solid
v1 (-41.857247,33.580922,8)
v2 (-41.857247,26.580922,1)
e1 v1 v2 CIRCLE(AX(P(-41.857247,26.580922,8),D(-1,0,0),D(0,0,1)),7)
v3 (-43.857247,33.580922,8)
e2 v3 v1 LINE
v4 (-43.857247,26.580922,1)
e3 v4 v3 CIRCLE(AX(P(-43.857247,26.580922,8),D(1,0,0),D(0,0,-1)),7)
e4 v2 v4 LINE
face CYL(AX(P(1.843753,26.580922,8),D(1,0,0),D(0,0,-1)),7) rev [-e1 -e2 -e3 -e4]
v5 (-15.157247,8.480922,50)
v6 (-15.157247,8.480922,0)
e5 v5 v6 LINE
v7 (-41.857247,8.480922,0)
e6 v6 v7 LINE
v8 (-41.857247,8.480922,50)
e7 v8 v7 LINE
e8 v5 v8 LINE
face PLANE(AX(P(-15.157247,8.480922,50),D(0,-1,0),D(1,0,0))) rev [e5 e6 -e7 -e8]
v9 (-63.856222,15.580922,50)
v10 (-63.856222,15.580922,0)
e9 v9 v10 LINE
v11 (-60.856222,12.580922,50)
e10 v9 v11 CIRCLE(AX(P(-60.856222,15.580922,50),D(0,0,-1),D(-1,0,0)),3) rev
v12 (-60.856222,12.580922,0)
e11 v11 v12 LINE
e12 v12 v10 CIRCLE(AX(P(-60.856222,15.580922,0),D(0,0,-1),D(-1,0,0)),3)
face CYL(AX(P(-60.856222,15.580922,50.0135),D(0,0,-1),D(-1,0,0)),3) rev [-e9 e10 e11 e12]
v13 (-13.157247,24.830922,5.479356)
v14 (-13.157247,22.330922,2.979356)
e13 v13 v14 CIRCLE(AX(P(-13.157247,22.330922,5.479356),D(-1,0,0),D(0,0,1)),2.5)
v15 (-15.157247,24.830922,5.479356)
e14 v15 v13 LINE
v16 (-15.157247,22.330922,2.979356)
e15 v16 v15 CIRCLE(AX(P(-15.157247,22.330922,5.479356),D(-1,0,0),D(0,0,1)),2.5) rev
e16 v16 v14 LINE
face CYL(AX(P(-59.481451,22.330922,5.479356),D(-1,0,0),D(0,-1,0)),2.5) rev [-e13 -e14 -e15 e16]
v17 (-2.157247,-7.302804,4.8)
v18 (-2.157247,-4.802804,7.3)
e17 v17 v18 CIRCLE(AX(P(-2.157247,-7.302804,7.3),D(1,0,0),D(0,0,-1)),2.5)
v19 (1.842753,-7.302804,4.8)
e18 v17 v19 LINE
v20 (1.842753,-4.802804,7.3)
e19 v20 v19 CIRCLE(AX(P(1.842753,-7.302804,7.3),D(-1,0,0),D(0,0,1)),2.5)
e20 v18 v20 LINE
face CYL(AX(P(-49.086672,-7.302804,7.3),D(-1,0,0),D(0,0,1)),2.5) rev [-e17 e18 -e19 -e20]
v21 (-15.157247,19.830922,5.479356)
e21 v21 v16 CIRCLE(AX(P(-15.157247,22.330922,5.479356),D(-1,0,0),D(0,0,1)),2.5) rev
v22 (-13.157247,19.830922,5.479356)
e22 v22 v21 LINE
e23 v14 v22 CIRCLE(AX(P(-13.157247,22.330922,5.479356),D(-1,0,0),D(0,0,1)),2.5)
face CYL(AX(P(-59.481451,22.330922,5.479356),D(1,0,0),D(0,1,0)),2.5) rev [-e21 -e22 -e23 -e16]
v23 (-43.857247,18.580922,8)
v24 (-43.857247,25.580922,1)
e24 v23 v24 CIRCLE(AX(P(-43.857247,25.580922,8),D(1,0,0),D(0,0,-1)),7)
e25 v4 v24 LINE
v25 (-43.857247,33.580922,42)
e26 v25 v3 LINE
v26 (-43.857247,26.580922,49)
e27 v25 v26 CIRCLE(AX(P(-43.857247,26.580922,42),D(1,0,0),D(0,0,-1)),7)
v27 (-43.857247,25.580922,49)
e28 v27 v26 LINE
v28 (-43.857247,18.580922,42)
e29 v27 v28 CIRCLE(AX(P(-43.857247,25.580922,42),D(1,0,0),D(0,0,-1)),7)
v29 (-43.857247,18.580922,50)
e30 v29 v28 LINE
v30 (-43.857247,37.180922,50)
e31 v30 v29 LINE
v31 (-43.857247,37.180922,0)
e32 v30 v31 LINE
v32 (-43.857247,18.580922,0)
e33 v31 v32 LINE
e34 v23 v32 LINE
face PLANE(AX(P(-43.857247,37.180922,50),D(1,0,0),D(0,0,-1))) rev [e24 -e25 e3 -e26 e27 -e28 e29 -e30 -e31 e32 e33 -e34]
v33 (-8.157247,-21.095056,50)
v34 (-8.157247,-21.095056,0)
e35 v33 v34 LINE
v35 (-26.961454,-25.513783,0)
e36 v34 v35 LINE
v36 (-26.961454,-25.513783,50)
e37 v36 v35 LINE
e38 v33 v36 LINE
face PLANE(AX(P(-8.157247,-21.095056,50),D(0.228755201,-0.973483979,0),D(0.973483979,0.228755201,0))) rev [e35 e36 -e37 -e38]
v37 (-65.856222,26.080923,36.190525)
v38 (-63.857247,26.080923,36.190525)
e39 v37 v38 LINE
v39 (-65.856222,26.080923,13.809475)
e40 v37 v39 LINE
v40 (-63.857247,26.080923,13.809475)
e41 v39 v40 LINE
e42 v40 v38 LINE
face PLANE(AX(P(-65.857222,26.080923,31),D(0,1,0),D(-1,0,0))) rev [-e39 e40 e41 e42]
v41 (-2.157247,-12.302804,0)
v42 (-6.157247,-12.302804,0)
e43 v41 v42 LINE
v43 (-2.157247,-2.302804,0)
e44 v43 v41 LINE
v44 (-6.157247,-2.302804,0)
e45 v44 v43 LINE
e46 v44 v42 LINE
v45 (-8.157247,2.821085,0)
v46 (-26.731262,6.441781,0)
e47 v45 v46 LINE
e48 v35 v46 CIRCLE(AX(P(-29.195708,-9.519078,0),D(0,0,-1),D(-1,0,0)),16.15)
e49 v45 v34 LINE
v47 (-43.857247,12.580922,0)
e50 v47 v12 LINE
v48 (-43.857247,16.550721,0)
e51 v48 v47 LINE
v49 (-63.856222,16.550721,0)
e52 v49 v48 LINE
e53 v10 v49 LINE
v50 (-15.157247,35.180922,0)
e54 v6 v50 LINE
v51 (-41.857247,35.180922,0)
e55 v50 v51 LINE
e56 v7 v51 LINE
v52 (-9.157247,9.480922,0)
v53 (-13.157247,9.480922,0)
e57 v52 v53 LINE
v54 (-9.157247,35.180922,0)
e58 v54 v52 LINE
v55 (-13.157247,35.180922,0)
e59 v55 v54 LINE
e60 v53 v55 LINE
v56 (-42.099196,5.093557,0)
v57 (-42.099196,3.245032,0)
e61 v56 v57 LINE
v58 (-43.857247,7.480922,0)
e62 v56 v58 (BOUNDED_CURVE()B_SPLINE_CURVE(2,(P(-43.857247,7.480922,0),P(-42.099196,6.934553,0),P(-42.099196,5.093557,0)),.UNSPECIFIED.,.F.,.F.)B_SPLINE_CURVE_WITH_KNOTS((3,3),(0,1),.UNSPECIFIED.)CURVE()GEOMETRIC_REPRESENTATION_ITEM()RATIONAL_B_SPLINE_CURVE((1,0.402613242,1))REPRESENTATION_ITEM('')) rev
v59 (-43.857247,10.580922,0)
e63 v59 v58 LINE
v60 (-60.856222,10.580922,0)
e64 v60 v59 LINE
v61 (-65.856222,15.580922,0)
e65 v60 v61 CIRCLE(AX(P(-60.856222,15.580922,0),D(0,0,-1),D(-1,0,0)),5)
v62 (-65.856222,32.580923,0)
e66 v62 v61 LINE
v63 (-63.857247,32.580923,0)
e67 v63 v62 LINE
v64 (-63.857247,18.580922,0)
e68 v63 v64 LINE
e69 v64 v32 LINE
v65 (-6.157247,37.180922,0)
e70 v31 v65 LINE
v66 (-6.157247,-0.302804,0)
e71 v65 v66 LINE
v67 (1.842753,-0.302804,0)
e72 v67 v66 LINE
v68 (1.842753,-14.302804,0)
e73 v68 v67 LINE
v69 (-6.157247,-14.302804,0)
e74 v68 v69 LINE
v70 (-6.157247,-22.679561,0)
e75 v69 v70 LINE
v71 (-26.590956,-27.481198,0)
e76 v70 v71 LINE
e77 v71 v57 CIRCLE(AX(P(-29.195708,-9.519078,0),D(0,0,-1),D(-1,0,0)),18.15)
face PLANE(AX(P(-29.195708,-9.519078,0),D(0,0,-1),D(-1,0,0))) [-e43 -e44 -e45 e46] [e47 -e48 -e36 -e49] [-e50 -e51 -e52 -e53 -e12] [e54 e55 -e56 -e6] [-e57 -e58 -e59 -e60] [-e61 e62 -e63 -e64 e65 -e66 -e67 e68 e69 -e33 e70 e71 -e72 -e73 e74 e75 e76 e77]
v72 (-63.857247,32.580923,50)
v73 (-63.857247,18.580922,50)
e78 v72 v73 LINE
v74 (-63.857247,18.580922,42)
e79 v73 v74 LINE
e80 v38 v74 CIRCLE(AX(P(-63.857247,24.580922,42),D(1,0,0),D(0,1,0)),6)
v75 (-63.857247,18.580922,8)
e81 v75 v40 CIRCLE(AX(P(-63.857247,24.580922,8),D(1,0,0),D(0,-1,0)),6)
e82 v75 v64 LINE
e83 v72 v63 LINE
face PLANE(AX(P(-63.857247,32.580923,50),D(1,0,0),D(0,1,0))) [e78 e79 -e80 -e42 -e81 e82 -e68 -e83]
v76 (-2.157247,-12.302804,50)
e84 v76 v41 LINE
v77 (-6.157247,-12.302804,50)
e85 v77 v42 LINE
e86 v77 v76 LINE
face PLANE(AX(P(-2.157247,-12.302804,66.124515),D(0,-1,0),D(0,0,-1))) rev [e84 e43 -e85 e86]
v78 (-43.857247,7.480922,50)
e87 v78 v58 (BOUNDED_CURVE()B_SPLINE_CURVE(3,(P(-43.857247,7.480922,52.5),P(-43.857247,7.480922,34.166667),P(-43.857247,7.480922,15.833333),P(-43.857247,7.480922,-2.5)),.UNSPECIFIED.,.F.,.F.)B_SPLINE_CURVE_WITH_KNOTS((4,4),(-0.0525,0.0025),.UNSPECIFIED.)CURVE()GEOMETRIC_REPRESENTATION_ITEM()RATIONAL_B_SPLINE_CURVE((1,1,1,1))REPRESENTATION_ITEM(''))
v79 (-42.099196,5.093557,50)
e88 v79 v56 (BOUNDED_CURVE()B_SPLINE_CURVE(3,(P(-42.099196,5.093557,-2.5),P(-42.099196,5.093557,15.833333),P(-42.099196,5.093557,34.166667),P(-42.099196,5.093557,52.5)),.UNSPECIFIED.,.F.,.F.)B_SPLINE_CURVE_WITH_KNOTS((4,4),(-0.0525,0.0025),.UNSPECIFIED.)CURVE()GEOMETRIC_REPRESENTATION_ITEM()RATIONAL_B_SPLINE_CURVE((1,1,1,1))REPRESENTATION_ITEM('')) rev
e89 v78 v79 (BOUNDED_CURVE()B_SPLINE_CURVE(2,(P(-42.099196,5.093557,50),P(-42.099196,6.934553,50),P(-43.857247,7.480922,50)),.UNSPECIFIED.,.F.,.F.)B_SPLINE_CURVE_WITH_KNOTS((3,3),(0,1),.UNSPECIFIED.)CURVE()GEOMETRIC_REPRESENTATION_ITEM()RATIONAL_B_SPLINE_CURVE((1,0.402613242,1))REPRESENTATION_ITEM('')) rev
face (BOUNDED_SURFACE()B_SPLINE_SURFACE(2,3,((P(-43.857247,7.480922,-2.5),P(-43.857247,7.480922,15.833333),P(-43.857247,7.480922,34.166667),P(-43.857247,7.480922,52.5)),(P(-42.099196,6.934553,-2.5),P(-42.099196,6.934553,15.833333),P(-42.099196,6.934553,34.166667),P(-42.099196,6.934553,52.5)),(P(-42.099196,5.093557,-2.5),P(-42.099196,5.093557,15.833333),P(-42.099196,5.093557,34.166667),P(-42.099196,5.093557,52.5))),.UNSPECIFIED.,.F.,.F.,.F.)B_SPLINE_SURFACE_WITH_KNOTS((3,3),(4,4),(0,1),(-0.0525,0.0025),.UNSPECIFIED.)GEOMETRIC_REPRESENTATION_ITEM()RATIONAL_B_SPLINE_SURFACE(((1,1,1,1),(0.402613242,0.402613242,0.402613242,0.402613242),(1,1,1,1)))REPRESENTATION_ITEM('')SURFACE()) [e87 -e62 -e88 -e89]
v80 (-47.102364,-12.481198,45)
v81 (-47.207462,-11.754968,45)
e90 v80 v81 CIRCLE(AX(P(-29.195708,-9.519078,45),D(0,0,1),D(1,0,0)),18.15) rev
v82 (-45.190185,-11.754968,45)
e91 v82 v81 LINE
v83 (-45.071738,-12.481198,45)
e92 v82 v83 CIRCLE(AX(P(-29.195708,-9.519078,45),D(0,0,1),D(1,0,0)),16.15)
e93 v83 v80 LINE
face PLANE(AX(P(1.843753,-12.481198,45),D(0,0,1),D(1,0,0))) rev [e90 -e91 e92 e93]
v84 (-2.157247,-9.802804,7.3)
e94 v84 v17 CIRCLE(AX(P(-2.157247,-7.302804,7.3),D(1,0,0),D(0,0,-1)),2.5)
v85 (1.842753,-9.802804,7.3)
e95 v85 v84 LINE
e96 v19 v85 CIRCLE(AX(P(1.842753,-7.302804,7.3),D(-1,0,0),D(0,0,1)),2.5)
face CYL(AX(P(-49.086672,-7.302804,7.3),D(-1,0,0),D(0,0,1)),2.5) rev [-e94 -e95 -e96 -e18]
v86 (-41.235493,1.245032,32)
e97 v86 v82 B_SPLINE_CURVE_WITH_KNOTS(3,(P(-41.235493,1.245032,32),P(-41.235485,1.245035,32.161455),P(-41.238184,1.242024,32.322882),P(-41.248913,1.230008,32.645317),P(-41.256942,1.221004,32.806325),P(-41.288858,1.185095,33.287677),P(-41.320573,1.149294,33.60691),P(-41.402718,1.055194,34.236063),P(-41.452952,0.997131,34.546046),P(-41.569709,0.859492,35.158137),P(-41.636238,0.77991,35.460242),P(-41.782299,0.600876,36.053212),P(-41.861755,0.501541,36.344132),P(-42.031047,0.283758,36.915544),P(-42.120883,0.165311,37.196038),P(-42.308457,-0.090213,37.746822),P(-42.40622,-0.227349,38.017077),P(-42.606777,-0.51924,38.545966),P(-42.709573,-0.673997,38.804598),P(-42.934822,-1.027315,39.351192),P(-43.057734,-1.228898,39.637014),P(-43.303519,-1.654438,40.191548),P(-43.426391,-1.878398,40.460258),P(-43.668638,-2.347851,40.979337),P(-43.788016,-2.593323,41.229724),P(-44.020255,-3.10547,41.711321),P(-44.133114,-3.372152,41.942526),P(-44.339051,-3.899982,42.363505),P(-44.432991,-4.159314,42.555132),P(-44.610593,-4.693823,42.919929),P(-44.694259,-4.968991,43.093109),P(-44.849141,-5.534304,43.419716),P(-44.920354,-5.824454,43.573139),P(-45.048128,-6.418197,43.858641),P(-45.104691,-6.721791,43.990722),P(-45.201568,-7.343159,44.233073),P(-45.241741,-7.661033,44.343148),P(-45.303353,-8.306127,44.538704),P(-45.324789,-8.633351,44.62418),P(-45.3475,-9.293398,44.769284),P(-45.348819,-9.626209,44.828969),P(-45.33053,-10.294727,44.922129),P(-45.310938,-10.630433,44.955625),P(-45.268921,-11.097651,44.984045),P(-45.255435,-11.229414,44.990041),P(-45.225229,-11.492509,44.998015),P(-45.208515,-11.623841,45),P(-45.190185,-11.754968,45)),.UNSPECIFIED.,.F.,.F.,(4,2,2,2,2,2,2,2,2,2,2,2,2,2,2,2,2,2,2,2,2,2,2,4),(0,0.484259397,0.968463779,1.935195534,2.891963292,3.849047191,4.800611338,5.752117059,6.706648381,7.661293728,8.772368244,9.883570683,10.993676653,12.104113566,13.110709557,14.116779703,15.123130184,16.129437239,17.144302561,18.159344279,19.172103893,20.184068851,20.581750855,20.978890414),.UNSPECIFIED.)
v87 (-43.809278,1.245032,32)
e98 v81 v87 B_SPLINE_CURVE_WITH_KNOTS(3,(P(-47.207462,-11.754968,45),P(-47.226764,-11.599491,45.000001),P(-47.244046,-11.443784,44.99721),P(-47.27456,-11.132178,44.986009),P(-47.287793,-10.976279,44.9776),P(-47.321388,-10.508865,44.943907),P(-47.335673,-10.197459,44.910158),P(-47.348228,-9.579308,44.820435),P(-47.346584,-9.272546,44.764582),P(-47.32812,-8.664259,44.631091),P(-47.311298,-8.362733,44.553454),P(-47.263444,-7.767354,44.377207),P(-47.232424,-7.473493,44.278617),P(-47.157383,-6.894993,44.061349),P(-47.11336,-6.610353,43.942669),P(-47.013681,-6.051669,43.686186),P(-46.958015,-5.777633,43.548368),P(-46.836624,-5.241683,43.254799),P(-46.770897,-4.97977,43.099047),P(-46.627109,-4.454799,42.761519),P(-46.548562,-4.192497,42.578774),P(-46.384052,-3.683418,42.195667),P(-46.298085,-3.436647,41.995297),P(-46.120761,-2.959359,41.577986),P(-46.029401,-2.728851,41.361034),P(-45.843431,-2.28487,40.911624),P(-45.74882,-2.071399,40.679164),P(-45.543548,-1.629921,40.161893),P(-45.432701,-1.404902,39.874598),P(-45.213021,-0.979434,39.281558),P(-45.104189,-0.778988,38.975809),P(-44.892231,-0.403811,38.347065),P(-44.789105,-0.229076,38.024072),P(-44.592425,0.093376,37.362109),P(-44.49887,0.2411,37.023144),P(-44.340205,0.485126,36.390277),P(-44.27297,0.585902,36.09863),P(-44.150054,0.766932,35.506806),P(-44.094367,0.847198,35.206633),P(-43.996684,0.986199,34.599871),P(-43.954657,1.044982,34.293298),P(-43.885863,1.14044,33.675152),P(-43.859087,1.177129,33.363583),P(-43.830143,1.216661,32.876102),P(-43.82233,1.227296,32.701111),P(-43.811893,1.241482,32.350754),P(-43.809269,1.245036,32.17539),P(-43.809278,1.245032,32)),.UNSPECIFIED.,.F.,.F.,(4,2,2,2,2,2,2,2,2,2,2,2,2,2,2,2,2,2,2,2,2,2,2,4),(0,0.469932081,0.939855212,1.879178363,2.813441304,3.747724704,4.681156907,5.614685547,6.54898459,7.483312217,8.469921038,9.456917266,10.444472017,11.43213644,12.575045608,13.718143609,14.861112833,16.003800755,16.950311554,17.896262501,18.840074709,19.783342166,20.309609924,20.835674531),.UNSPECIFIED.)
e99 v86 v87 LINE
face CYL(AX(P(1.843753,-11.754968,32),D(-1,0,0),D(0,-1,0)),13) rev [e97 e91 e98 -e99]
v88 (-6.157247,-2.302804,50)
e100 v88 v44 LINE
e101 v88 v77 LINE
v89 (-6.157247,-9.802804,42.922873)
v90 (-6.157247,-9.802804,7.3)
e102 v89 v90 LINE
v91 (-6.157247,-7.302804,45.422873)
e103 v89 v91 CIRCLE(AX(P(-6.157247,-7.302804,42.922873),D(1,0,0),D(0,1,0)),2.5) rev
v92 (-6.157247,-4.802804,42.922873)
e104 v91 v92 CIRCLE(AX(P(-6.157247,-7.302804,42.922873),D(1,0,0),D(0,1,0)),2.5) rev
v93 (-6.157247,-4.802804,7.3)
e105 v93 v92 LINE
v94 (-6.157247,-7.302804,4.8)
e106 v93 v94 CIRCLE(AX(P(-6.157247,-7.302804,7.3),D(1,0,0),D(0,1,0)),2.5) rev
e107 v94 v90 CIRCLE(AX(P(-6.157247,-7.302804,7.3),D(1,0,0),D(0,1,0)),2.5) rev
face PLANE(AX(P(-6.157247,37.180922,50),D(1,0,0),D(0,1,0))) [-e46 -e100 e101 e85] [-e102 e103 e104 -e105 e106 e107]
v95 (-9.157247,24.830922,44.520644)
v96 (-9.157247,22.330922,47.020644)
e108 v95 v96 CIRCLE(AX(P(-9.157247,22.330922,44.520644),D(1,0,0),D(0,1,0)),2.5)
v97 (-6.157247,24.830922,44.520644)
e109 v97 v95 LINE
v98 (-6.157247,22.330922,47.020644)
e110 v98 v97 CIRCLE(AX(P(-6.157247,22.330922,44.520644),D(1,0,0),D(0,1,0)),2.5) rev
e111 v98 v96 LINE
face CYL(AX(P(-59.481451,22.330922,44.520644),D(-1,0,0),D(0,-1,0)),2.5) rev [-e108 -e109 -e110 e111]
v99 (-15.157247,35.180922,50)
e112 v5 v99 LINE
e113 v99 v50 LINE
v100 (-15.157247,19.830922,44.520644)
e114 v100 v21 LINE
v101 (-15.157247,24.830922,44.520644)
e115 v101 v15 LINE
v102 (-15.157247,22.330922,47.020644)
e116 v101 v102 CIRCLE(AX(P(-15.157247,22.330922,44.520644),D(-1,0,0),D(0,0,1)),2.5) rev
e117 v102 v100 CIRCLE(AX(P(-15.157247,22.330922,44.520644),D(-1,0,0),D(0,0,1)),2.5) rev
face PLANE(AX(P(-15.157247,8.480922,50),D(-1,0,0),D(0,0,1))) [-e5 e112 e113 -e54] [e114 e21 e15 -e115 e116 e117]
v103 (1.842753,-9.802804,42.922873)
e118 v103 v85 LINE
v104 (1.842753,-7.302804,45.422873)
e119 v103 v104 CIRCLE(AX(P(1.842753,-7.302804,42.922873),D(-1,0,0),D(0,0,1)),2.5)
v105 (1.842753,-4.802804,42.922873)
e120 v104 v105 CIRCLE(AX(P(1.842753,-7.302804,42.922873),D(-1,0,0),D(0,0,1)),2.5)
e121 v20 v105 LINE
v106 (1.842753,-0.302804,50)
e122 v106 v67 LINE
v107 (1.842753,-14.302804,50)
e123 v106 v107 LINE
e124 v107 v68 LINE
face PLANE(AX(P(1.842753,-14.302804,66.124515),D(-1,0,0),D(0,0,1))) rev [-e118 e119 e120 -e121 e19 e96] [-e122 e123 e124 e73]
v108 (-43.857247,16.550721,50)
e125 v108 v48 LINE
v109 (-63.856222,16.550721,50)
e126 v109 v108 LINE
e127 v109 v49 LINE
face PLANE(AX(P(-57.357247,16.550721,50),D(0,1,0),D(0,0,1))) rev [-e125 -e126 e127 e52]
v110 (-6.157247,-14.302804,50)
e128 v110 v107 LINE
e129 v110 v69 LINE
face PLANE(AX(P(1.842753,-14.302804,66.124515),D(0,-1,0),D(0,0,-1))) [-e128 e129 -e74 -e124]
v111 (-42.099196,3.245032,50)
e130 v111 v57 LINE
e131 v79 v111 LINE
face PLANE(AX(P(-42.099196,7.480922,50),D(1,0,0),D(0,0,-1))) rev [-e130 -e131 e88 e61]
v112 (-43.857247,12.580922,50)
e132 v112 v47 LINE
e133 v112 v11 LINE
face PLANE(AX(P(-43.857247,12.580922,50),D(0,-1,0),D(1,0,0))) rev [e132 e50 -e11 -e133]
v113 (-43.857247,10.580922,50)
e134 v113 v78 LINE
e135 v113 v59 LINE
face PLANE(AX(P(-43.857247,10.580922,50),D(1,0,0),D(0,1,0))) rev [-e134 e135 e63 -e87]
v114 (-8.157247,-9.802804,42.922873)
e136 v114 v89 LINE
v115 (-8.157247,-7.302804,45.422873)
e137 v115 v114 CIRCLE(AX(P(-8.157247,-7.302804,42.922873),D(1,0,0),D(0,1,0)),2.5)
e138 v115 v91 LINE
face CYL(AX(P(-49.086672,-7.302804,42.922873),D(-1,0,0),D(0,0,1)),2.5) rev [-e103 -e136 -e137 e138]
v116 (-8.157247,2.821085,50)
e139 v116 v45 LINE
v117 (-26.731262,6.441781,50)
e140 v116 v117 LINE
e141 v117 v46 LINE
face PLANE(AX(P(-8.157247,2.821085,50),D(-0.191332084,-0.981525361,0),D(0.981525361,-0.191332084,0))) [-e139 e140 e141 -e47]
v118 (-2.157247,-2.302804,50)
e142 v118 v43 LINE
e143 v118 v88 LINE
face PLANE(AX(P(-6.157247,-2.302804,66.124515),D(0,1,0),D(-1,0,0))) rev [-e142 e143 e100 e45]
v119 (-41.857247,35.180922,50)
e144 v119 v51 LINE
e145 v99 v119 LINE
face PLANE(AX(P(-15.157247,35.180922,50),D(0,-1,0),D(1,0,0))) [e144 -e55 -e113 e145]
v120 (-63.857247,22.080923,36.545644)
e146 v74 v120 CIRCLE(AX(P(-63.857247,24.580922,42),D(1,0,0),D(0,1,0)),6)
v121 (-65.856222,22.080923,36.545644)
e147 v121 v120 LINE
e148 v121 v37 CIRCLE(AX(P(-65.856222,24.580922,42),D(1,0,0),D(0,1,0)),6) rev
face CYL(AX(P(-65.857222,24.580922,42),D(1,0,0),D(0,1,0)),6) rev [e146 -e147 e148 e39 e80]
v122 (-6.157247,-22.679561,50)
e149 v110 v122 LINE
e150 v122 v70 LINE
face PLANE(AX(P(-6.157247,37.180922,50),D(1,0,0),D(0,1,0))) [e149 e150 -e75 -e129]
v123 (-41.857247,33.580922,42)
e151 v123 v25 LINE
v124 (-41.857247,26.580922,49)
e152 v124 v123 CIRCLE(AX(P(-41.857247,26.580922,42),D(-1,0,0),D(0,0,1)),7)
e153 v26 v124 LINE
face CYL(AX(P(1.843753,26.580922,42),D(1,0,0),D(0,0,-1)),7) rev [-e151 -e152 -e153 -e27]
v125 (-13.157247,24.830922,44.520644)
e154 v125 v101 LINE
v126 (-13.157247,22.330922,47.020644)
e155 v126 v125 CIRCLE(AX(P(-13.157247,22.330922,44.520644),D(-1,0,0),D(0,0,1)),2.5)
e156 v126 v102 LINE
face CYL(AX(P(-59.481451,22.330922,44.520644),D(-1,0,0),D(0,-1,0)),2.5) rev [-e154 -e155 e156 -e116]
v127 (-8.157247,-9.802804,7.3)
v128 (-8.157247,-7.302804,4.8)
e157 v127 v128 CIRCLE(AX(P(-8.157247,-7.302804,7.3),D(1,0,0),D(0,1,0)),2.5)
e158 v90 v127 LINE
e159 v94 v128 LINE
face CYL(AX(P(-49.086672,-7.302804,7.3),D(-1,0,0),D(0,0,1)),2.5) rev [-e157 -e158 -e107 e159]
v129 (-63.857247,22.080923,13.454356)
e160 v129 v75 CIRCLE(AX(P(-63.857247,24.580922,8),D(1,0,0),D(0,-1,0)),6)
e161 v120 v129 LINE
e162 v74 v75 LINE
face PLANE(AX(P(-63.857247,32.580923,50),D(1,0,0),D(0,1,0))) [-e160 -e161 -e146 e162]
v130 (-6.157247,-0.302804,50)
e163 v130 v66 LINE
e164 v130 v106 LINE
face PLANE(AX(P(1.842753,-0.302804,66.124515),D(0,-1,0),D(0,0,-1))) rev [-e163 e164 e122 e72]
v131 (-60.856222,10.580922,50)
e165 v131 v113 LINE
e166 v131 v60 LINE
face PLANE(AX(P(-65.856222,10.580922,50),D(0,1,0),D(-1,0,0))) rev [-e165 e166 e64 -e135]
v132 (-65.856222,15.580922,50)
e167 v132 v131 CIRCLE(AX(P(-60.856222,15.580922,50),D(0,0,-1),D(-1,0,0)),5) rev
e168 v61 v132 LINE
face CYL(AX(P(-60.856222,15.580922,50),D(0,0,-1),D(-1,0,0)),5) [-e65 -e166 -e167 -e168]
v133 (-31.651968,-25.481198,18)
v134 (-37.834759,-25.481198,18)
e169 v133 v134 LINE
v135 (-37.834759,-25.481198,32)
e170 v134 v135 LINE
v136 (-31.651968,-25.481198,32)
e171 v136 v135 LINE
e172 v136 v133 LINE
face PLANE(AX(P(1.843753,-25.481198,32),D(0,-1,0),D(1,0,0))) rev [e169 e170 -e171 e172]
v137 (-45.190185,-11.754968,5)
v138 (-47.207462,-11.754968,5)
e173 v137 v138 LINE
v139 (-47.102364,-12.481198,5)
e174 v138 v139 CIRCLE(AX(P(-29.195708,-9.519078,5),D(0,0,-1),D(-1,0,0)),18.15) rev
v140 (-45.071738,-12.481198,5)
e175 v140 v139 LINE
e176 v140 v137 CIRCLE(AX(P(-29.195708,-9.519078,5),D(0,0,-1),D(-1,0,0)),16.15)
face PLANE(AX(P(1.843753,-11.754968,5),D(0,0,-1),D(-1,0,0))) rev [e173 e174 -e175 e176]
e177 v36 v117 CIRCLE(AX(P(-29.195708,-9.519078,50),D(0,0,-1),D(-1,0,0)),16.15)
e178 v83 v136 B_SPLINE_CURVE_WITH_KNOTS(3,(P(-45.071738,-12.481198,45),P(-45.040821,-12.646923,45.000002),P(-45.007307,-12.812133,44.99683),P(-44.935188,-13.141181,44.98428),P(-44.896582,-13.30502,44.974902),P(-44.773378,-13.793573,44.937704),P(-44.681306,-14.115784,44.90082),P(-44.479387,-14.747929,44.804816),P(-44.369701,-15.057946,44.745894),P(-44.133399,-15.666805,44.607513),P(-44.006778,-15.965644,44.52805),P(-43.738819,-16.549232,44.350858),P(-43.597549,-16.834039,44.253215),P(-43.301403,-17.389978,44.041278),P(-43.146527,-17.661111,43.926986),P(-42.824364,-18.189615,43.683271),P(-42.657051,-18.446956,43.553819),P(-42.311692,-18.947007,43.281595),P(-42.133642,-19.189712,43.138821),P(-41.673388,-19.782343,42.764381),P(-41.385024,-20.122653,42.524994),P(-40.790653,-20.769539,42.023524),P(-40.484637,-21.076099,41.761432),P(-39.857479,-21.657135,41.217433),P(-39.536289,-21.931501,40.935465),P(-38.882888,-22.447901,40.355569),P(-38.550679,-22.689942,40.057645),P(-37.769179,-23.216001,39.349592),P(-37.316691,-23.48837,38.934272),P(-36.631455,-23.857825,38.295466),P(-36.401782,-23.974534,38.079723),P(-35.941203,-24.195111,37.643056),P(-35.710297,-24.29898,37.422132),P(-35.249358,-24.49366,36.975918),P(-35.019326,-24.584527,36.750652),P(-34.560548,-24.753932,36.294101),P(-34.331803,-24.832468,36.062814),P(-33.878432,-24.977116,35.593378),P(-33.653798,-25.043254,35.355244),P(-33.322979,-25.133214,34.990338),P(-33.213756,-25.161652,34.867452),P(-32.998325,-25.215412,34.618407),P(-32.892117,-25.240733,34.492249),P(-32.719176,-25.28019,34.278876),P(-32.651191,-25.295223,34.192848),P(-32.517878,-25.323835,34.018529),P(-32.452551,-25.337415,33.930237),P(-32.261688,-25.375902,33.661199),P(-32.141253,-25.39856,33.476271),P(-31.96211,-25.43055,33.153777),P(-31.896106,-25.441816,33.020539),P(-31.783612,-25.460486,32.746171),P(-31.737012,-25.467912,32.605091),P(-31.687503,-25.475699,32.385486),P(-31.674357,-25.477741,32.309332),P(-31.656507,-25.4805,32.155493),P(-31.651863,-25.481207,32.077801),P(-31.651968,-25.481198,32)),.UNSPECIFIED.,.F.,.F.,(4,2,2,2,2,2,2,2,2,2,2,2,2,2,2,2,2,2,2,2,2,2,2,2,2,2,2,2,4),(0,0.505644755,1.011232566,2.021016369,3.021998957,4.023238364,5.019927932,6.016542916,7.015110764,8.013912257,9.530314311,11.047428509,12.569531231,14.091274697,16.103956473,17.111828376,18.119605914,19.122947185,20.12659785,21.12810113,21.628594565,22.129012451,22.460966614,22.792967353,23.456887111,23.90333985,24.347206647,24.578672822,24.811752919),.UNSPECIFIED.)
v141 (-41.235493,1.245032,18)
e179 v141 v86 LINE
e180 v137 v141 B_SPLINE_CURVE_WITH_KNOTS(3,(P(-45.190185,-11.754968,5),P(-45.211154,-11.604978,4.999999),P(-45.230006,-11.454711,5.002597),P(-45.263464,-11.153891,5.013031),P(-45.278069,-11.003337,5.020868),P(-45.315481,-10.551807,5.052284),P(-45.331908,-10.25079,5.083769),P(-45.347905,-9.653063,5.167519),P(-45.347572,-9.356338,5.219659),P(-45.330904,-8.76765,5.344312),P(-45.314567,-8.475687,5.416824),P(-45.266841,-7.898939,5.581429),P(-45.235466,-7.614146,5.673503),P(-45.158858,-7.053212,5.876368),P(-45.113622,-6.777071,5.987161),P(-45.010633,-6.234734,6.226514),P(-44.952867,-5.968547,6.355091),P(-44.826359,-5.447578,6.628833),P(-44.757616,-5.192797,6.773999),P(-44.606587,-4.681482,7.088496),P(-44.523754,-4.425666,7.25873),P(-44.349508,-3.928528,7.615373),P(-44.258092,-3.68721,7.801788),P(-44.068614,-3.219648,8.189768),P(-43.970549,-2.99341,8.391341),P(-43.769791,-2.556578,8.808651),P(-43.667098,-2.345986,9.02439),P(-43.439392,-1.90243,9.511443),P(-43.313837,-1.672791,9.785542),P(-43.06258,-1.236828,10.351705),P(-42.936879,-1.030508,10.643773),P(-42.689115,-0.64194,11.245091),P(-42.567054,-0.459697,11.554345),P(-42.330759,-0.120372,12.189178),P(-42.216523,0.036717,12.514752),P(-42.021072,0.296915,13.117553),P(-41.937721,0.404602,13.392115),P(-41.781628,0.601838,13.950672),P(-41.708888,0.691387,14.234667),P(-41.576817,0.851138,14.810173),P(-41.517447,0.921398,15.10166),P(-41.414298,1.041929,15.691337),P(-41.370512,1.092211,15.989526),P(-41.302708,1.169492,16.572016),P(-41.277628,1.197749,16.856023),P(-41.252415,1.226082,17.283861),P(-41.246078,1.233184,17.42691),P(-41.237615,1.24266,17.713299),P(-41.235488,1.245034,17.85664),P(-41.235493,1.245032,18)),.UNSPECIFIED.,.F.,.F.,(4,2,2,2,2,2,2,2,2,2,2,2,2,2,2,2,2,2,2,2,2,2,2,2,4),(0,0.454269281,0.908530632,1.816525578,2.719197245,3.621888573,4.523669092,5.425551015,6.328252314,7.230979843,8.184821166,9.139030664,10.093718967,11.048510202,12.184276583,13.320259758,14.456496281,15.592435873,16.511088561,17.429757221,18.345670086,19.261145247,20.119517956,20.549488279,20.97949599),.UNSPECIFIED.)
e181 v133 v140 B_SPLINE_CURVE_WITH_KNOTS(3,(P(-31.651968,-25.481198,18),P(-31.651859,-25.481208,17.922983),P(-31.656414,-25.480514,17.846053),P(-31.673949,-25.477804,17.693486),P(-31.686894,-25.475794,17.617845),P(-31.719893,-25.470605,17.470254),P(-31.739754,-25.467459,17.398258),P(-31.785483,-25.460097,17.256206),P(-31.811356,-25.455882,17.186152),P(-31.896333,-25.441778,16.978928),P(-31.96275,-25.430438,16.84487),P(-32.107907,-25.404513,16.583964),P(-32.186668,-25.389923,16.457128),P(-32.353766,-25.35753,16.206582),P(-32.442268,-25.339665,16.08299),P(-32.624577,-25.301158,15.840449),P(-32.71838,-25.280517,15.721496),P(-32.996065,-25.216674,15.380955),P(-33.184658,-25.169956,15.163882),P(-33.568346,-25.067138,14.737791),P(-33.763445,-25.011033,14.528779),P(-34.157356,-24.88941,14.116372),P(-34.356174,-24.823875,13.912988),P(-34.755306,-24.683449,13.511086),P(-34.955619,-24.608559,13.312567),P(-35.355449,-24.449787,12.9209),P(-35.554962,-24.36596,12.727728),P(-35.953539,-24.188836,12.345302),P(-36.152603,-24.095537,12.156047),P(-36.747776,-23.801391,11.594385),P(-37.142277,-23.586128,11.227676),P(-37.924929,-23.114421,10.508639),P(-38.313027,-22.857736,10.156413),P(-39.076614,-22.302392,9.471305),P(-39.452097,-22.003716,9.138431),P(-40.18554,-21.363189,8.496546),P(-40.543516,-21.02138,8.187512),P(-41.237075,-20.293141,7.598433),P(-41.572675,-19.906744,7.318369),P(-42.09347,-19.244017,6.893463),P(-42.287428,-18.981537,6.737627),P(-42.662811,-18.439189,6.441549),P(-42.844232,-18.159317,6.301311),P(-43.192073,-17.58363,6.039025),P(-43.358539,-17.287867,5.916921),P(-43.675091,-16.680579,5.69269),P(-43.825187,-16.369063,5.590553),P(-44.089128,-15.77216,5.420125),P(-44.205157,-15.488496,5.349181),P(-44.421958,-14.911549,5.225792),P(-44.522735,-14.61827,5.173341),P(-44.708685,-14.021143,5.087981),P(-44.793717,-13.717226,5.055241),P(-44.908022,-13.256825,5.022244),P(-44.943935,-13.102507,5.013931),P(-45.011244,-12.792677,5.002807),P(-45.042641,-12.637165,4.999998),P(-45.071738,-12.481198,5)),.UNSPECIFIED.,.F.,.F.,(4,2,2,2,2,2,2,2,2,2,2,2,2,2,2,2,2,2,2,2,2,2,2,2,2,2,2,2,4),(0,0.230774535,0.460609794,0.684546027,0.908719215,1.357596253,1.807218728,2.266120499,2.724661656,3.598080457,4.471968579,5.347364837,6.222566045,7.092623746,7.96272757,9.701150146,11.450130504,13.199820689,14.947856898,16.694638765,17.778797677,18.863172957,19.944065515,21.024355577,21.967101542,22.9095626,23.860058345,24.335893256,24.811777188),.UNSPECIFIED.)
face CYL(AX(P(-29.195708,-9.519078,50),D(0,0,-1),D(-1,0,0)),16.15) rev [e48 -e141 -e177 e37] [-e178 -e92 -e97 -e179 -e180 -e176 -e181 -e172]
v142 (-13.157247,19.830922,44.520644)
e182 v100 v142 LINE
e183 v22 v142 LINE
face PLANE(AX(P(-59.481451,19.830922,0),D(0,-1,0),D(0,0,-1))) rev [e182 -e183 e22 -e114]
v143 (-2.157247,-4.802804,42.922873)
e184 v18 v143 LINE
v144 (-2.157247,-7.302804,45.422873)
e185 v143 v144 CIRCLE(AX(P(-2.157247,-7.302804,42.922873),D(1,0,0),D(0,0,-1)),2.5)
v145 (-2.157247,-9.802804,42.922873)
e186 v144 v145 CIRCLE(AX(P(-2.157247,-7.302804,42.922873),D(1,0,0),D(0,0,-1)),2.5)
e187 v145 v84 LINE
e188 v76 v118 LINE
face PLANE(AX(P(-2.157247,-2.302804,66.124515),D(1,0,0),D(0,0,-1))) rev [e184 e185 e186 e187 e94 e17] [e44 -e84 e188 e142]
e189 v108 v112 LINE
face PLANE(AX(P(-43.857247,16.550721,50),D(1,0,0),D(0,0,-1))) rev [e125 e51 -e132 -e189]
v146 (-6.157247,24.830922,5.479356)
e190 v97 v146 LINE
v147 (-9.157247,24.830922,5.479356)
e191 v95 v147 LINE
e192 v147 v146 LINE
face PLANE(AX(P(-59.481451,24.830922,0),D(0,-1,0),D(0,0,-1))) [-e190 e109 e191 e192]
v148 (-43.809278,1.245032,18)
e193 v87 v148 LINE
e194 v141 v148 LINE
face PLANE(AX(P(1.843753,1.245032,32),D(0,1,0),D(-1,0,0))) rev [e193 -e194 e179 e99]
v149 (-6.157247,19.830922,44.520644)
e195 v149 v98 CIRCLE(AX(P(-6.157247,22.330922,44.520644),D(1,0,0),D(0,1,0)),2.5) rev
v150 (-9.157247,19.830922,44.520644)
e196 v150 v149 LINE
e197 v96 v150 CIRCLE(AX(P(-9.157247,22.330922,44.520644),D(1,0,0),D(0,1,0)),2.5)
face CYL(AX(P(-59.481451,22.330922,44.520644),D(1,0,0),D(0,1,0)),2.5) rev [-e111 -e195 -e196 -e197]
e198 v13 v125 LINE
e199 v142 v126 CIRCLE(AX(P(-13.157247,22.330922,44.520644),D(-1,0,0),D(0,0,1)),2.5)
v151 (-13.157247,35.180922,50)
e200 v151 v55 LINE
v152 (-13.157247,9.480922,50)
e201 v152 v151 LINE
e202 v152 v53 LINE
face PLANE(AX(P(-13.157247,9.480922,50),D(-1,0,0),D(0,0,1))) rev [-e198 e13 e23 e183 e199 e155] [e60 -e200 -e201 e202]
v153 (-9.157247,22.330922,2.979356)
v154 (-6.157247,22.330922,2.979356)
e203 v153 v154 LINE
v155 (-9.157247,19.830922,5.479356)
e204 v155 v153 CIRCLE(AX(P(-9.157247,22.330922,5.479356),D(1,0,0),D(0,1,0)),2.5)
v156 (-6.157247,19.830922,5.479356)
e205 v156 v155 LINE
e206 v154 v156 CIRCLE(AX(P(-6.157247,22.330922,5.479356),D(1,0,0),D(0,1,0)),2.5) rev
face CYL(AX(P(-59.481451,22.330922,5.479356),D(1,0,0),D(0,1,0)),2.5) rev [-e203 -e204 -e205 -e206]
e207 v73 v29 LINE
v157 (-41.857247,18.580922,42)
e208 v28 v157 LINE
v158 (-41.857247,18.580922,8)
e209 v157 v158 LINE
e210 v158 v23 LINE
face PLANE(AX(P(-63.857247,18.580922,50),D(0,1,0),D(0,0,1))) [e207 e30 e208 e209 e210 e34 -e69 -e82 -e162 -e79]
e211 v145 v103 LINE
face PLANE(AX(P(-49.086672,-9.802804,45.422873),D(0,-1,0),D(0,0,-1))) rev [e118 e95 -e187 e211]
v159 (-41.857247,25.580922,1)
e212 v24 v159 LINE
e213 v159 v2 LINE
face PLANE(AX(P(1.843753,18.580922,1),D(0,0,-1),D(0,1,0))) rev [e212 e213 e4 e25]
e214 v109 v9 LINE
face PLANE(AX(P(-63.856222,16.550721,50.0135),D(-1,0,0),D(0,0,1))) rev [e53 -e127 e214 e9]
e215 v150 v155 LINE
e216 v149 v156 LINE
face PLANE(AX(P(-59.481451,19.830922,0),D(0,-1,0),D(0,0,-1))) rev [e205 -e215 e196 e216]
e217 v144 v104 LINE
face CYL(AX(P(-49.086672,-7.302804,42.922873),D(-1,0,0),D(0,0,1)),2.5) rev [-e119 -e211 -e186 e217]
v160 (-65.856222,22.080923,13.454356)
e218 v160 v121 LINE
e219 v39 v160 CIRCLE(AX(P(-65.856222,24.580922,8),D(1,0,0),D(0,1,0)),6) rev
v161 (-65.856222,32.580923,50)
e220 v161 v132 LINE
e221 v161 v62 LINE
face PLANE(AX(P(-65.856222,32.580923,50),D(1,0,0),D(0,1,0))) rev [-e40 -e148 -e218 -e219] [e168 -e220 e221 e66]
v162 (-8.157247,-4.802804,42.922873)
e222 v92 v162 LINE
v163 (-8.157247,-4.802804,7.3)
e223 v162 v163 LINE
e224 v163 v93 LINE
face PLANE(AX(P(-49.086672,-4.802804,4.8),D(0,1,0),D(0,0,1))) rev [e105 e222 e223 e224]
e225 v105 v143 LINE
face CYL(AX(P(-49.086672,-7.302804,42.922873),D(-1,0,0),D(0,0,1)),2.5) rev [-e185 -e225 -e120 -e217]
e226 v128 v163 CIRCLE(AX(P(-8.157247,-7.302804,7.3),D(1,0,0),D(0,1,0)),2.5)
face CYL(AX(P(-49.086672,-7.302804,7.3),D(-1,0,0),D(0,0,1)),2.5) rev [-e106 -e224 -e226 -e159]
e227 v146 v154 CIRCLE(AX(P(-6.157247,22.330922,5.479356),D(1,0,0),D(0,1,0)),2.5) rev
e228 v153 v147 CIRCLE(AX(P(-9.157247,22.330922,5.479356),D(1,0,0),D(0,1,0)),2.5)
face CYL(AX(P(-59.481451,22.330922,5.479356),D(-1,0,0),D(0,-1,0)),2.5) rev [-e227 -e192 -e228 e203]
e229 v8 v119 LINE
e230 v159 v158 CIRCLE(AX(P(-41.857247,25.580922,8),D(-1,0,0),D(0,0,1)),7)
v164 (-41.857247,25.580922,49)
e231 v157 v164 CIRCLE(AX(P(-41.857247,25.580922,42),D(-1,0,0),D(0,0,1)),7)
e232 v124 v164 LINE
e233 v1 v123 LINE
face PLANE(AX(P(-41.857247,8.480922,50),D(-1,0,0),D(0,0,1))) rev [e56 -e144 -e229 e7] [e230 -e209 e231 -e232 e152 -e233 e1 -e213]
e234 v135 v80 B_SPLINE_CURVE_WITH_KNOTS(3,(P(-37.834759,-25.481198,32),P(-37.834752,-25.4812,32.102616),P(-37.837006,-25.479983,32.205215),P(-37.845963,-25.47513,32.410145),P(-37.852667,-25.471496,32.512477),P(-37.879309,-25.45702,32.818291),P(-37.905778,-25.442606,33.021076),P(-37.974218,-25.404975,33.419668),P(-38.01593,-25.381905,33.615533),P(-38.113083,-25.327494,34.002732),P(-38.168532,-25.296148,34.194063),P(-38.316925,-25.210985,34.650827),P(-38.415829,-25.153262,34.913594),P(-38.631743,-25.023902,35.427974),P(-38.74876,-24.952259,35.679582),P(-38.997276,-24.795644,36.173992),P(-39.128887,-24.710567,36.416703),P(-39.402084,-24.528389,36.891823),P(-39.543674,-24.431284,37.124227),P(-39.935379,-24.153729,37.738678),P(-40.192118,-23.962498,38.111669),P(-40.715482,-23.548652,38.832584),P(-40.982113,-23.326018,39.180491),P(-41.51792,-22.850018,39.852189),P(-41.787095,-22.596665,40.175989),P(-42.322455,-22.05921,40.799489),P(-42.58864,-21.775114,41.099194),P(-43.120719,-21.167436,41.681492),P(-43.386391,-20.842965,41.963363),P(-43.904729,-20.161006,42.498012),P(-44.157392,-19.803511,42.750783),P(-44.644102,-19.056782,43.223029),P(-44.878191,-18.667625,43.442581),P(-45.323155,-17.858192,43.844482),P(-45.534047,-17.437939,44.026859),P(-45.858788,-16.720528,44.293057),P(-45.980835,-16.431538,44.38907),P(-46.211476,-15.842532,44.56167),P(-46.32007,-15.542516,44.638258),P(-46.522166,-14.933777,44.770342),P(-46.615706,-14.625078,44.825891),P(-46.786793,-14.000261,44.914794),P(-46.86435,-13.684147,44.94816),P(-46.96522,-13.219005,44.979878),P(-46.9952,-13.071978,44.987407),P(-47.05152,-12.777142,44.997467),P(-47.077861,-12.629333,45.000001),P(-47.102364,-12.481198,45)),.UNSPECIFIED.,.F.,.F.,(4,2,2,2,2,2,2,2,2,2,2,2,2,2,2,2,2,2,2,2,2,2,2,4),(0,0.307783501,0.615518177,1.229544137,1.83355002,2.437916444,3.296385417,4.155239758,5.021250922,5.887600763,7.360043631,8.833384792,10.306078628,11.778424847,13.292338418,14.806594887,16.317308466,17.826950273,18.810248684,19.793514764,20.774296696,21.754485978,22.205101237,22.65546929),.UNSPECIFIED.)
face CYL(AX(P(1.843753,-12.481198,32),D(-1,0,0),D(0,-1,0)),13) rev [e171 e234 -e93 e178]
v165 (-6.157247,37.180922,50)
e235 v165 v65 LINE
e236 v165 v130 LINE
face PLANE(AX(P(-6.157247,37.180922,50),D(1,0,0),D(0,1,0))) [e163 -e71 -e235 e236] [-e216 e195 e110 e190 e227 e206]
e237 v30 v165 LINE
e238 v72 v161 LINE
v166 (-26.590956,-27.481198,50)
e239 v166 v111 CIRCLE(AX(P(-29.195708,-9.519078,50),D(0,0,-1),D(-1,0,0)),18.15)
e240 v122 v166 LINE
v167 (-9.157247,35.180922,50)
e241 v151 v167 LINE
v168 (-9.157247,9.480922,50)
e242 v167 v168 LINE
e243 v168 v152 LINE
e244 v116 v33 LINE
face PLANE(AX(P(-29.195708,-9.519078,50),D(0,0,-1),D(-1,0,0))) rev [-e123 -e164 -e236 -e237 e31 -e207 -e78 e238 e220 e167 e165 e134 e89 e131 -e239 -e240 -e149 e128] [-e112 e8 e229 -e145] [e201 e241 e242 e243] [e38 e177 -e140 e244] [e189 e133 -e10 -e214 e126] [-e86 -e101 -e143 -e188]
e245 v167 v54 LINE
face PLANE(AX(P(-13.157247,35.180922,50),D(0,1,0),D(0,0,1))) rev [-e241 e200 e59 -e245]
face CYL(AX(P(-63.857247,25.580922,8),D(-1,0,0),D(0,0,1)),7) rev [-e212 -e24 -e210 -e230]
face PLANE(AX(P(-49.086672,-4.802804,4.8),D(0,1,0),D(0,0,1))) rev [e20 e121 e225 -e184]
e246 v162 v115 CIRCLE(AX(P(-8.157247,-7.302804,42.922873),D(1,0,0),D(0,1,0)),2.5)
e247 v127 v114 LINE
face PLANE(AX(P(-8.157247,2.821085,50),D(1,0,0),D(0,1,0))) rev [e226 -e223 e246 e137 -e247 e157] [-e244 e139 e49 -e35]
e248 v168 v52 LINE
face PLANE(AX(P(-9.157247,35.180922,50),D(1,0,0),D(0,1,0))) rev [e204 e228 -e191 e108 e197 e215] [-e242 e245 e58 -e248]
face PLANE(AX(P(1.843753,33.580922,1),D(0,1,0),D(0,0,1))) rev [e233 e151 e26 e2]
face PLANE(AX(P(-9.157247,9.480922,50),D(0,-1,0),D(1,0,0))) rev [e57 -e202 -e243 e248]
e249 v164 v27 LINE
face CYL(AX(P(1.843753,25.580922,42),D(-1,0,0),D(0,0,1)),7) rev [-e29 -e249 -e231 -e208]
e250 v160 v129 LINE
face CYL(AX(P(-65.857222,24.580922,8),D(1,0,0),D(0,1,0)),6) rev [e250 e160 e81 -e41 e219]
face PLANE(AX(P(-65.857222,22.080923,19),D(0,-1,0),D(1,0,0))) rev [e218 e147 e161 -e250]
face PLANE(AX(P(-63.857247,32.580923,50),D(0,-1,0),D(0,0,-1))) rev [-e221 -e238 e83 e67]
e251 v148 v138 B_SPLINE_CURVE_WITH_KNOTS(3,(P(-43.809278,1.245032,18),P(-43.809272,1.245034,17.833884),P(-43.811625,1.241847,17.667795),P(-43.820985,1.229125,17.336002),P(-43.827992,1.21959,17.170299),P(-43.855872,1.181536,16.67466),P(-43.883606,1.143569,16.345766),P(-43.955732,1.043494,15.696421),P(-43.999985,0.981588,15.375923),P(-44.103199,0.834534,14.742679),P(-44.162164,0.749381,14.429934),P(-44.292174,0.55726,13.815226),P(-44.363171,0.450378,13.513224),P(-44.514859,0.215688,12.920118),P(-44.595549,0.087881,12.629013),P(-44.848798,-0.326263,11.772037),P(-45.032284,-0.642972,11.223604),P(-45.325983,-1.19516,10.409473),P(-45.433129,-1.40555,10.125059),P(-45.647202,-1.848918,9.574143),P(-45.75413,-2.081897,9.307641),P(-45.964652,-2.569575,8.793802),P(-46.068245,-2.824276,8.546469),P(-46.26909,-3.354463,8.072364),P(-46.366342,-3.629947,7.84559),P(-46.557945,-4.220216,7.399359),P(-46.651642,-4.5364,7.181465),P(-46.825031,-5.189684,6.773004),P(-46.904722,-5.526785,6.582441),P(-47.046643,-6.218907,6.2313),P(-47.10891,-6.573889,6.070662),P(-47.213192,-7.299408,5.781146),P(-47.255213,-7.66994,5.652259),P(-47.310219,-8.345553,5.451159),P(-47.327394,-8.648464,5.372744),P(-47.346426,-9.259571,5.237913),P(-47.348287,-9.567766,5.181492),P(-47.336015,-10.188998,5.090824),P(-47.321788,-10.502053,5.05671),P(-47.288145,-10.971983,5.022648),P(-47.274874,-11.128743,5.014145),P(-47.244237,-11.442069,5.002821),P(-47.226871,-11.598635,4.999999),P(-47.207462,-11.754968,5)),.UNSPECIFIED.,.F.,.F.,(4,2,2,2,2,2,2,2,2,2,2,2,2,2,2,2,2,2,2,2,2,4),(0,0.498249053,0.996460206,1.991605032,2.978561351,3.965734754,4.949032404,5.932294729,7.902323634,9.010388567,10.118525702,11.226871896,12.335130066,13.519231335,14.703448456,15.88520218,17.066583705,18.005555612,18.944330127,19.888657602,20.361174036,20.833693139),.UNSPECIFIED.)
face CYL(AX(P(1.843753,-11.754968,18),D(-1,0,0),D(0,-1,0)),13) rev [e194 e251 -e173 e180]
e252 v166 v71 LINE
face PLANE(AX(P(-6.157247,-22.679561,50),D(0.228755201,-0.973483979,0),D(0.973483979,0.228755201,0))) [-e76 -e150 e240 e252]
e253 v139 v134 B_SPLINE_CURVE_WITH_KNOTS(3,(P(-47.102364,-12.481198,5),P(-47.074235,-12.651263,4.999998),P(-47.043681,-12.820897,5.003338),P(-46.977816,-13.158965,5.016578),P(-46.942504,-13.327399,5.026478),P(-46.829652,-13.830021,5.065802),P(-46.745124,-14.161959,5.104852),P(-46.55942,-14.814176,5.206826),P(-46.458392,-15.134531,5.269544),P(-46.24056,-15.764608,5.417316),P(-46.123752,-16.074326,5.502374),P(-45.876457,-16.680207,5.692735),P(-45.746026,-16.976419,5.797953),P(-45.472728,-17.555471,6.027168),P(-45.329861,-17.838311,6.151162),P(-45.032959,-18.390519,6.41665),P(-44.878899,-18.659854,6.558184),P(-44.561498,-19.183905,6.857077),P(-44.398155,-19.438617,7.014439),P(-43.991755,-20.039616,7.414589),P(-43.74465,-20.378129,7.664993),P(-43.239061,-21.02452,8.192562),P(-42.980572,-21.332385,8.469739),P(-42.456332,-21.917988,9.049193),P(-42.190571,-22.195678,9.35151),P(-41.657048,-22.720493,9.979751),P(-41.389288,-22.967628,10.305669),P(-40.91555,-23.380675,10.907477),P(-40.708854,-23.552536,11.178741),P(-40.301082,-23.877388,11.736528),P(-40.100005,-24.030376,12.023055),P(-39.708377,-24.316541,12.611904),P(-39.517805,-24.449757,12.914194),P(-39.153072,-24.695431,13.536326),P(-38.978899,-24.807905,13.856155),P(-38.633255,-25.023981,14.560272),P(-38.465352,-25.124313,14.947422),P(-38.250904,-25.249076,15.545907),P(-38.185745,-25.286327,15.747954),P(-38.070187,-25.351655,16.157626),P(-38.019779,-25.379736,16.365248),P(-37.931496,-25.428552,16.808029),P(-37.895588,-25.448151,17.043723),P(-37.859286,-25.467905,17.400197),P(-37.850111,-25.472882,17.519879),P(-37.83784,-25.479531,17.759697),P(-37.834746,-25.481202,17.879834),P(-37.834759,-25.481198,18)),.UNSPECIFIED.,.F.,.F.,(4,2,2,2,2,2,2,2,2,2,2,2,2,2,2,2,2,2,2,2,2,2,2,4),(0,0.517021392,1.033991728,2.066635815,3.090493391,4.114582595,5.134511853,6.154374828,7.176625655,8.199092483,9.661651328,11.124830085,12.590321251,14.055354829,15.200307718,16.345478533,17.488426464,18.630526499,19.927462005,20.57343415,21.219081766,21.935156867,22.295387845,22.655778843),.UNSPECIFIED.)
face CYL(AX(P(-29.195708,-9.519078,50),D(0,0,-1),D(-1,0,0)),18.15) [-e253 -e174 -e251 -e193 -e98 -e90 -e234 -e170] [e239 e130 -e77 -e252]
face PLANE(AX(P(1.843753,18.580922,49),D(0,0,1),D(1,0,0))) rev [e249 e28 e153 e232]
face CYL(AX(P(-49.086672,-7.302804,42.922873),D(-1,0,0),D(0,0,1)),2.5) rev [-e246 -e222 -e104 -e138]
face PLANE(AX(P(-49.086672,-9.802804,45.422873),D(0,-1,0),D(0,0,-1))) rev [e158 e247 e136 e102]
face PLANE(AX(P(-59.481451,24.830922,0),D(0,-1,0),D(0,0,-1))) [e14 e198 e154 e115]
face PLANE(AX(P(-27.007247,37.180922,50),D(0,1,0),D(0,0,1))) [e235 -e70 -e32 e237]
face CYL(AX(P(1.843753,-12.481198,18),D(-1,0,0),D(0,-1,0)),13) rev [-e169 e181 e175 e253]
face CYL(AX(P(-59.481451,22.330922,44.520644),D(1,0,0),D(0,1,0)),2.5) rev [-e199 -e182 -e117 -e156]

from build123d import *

# Parameters (mm, degrees)
CROQUIS3_W                  = 26.7
CROQUIS3_H                  = 26.7
CROQUIS3_W_2                = 4
CROQUIS3_H_2                = 25.7
CROQUIS3_W_3                = 13.5
CROQUIS3_H_3                = 3.969798642
SALIENTE_EXTRUIR1_DEPTH     = 50
SALIENTE_EXTRUIR2_DEPTH     = 50
CORTAR_EXTRUIR12_REACH      = 94.009
CORTAR_EXTRUIR13_REACH      = 79.272
CROQUIS13_W                 = 48
CROQUIS13_H                 = 15
REDONDEO1_R                 = 2.5
CORTAR_EXTRUIR14_REACH      = 88.292
REDONDEO2_R                 = 2.5
CORTAR_EXTRUIR15_REACH      = 92.548
REDONDEO3_R                 = 5
REDONDEO4_DEPTH             = 50
CORTAR_EXTRUIR17_REACH      = 81.89
CORTAR_EXTRUIR17_END_RADIUS = 16.15
REDONDEO5_R                 = 7
CORTAR_EXTRUIR18_REACH      = 92.661


with BuildPart() as part:
    # Croquis3 → Saliente-Extruir1 (new body)
    with BuildSketch(Plane.XY):
        with BuildLine():
            Line((-63.857247249, 32.580922569), (-63.857247249, 18.580922369))
            Line((-63.857247249, 18.580922369), (-43.857247249, 18.580922369))
            Line((-43.857247249, 18.580922369), (-43.857247249, 37.180922369))
            Line((-43.857247249, 37.180922369), (-27.007247249, 37.180922369))
            Line((-27.007247249, 37.180922369), (-6.157247249, 37.180922369))
            Line((-6.157247249, 37.180922369), (-6.157247249, -22.679560551))
            Line((-6.157247249, -22.679560551), (-26.590955846, -27.481197975))
            ThreePointArc((-26.590955846, -27.481197975), (-45.398833914, -17.697170572), (-42.099195701, 3.245032209))
            Line((-42.099195701, 3.245032209), (-42.099195701, 7.480922369))
            Line((-42.099195701, 7.480922369), (-43.857247249, 7.480922369))
            Line((-43.857247249, 7.480922369), (-43.857247249, 10.580922369))
            Line((-43.857247249, 10.580922369), (-65.856221771, 10.580922369))
            Line((-65.856221771, 10.580922369), (-65.856221771, 16.580922369))
            Line((-65.856221771, 16.580922369), (-65.856221771, 32.580922569))
            Line((-65.856221771, 32.580922569), (-63.857247249, 32.580922569))
        make_face()
        with Locations((-28.507247249, 21.830922369)):
            Rectangle(CROQUIS3_W, CROQUIS3_H, mode=Mode.SUBTRACT)
        with Locations((-11.157247249, 22.330922369)):
            Rectangle(CROQUIS3_W_2, CROQUIS3_H_2, mode=Mode.SUBTRACT)
        with Locations((-50.607247249, 14.56582169)):
            Rectangle(CROQUIS3_W_3, CROQUIS3_H_3, mode=Mode.SUBTRACT)
        with BuildLine():
            Line((-8.157247249, 2.82108494), (-26.731262437, 6.441781026))
            ThreePointArc((-26.731262437, 6.441781026), (-45.345288804, -9.402744466), (-26.961453667, -25.513783269))
            Line((-26.961453667, -25.513783269), (-8.157247249, -21.095056202))
            Line((-8.157247249, -21.095056202), (-8.157247249, 2.82108494))
        make_face(mode=Mode.SUBTRACT)
    extrude(amount=SALIENTE_EXTRUIR1_DEPTH)

    # Croquis11 → Saliente-Extruir2 (add)
    with BuildSketch(Plane(origin=(0, 0, 0), x_dir=(-1, 0, 0), z_dir=(0, 0, -1))):
        Polygon((-1.842752751, -14.302804028), (-1.842752751, -0.302804028), (6.157247249, -0.302804028), (6.157247249, -2.302804028), (2.157247249, -2.302804028), (2.157247249, -12.302804028), (6.157247249, -12.302804028), (6.157247249, -14.302804028), align=None)
    extrude(amount=-SALIENTE_EXTRUIR2_DEPTH)

    # Cortar-Extruir12: up to this face of the body (flat: up to its plane)
    cortar_extruir12_end = Plane(part.part.faces().sort_by_distance((-8.157247249, -9.136985631, 25))[0])
    # Croquis12 → Cortar-Extruir12 (cut, up to the picked face)
    with BuildSketch(Plane(origin=(1.842752751, 0, 0), x_dir=(0, 0, -1), z_dir=(1, 0, 0)), mode=Mode.PRIVATE) as cortar_extruir12_sk1:
        Polygon((-25, -9.802804028), (-4.8, -9.802804028), (-4.8, -4.802804028), (-45.42287301, -4.802804028), (-45.42287301, -9.802804028), align=None)
    cortar_extruir12_tool1 = split(extrude(cortar_extruir12_sk1.sketch, amount=-CORTAR_EXTRUIR12_REACH, mode=Mode.PRIVATE), bisect_by=cortar_extruir12_end, keep=Keep.BOTH, mode=Mode.PRIVATE)
    add(cortar_extruir12_tool1.solids().sort_by(Axis((1.842753, -7.302804, 25.111437), (-1, 0, 0)))[0], mode=Mode.SUBTRACT)

    # Croquis13 → Cortar-Extruir13 (cut, up to next)
    with BuildSketch(Plane.ZY.offset(43.857247249), mode=Mode.PRIVATE) as cortar_extruir13_sk1:
        with Locations((25, 26.080922369)):
            Rectangle(CROQUIS13_W, CROQUIS13_H)
    cortar_extruir13_tool1 = extrude(cortar_extruir13_sk1.sketch, amount=-CORTAR_EXTRUIR13_REACH, mode=Mode.PRIVATE) & part.part
    add(cortar_extruir13_tool1.solids().sort_by_distance((-43.857247, 26.080922, 25))[0], mode=Mode.SUBTRACT)

    # Redondeo1
    redondeo1_edges = [part.edges().sort_by_distance(p)[0] for p in [
        (-0.157247249, -4.802804028, 4.8),
        (-0.157247249, -9.802804028, 4.8),
        (-0.157247249, -9.802804028, 45.42287301),
        (-0.157247249, -4.802804028, 45.42287301),
        (-7.157247249, -9.802804028, 4.8),
        (-7.157247249, -4.802804028, 4.8),
        (-7.157247249, -9.802804028, 45.42287301),
        (-7.157247249, -4.802804028, 45.42287301),
    ]]
    fillet(redondeo1_edges, radius=REDONDEO1_R - 0.0001)  # a hair under: the kernel refuses the full size

    # Cortar-Extruir14: up to this face of the body (flat: up to its plane)
    cortar_extruir14_end = Plane(part.part.faces().sort_by_distance((-15.157247249, 21.830922369, 25))[0])
    # Croquis14 → Cortar-Extruir14 (cut, up to the picked face)
    with BuildSketch(Plane(origin=(-6.157247249, 0, 0), x_dir=(0, 0, -1), z_dir=(1, 0, 0)), mode=Mode.PRIVATE) as cortar_extruir14_sk1:
        Polygon((-2.979356026, 22.330922369), (-2.979356026, 19.830922369), (-47.020643974, 19.830922369), (-47.020643974, 22.330922369), (-47.020643974, 24.830922369), (-2.979356026, 24.830922369), align=None)
    cortar_extruir14_tool1 = split(extrude(cortar_extruir14_sk1.sketch, amount=-CORTAR_EXTRUIR14_REACH, mode=Mode.PRIVATE), bisect_by=cortar_extruir14_end, keep=Keep.BOTH, mode=Mode.PRIVATE)
    add(cortar_extruir14_tool1.solids().sort_by(Axis((-6.157247, 22.330922, 25), (-1, 0, 0)))[0], mode=Mode.SUBTRACT)

    # Redondeo2
    redondeo2_edges = [part.edges().sort_by_distance(p)[0] for p in [
        (-14.157247249, 24.830922369, 2.979356026),
        (-7.657247249, 24.830922369, 2.979356026),
        (-7.657247249, 19.830922369, 2.979356026),
        (-14.157247249, 19.830922369, 2.979356026),
        (-14.157247249, 24.830922369, 47.020643974),
        (-7.657247249, 24.830922369, 47.020643974),
        (-7.657247249, 19.830922369, 47.020643974),
        (-14.157247249, 19.830922369, 47.020643974),
    ]]
    fillet(redondeo2_edges, radius=REDONDEO2_R - 0.0001)  # a hair under: the kernel refuses the full size

    # Croquis15 → Cortar-Extruir15 (cut, up to next)
    with BuildSketch(Plane(origin=(-63.857247249, 0, 0), x_dir=(0, 0, -1), z_dir=(1, 0, 0)), mode=Mode.PRIVATE) as cortar_extruir15_sk1:
        with BuildLine():
            Line((-31, 26.080922569), (-19, 26.080922569))
            Line((-19, 26.080922569), (-13.809474968, 26.080922569))
            ThreePointArc((-13.809474968, 26.080922569), (-2.023506642, 25.111513684), (-13.454356149, 22.080922569))
            Line((-13.454356149, 22.080922569), (-19, 22.080922569))
            Line((-19, 22.080922569), (-31, 22.080922569))
            Line((-31, 22.080922569), (-36.545643851, 22.080922569))
            ThreePointArc((-36.545643851, 22.080922569), (-47.976493358, 25.111513684), (-36.190525032, 26.080922569))
            Line((-36.190525032, 26.080922569), (-31, 26.080922569))
        make_face()
    cortar_extruir15_tool1 = extrude(cortar_extruir15_sk1.sketch, amount=-CORTAR_EXTRUIR15_REACH, mode=Mode.PRIVATE) & part.part
    add(cortar_extruir15_tool1.solids().sort_by_distance((-63.857247, 24.436716, 25))[0], mode=Mode.SUBTRACT)

    # Redondeo3
    redondeo3_edges = [part.edges().sort_by_distance(p)[0] for p in [
        (-65.856221771, 10.580922369, 25),
    ]]
    fillet(redondeo3_edges, radius=REDONDEO3_R)

    # Redondeo4: read off the stored shape, not the designer's step
    # Redondeo4 outline → Redondeo4 (add)
    with BuildSketch(Plane.XY):
        with BuildLine():
            Line((-42.099195701, 7.480922369), (-43.857247249, 7.480922369))
            add(Edge.make_bspline(
                [(-43.857247249, 7.480922369), (-42.099195701, 6.934552825), (-42.099195701, 5.093557191)],
                knots=[0, 0, 0, 1, 1, 1], degree=2, weights=[1, 0.402613242, 1]))
            Line((-42.099195701, 5.093557191), (-42.099195701, 7.480922369))
        make_face()
    extrude(amount=REDONDEO4_DEPTH)

    # Cortar-Extruir17: up to this cylinder (the profile starts outside it)
    cortar_extruir17_end = Plane(origin=(-29.1957078, -9.519077631, 25), z_dir=(0, 0, -1)) * Cylinder(CORTAR_EXTRUIR17_END_RADIUS, 197.08, mode=Mode.PRIVATE)
    # Croquis16 → Cortar-Extruir17 (cut, up to the surface)
    with BuildSketch(Plane.ZY.offset(48.157247249), mode=Mode.PRIVATE) as cortar_extruir17_sk1:
        with BuildLine():
            Line((32, -25.481197975), (18, -25.481197975))
            ThreePointArc((18, -25.481197975), (8.807611845, -21.67358613), (5, -12.481197975))
            Line((5, -12.481197975), (5, -11.754967791))
            ThreePointArc((5, -11.754967791), (8.807611845, -2.562579636), (18, 1.245032209))
            Line((18, 1.245032209), (32, 1.245032209))
            ThreePointArc((32, 1.245032209), (41.192388155, -2.562579636), (45, -11.754967791))
            Line((45, -11.754967791), (45, -12.481197975))
            ThreePointArc((45, -12.481197975), (41.192388155, -21.67358613), (32, -25.481197975))
        make_face()
    cortar_extruir17_tool1 = extrude(cortar_extruir17_sk1.sketch, amount=-CORTAR_EXTRUIR17_REACH, mode=Mode.PRIVATE) - cortar_extruir17_end
    add(cortar_extruir17_tool1.solids().sort_by_distance((-48.157247, -12.118083, 25))[0], mode=Mode.SUBTRACT)

    # Redondeo5
    redondeo5_edges = [part.edges().sort_by_distance(p)[0] for p in [
        (-42.857247249, 18.580922369, 1),
        (-42.857247249, 33.580922369, 1),
        (-42.857247249, 33.580922369, 49),
        (-42.857247249, 18.580922369, 49),
    ]]
    fillet(redondeo5_edges, radius=REDONDEO5_R)

    # Croquis17 → Cortar-Extruir18 (cut, up to next)
    with BuildSketch(Plane(origin=(0, 0, 0), x_dir=(-1, 0, 0), z_dir=(0, 0, -1)), mode=Mode.PRIVATE) as cortar_extruir18_sk1:
        with BuildLine():
            Line((60.856221771, 12.580922369), (57.357247249, 12.580922369))
            Line((57.357247249, 12.580922369), (57.357247249, 16.550721011))
            Line((57.357247249, 16.550721011), (63.856221771, 16.550721011))
            Line((63.856221771, 16.550721011), (63.856221771, 15.580922369))
            ThreePointArc((63.856221771, 15.580922369), (62.977542115, 13.459602026), (60.856221771, 12.580922369))
        make_face()
    cortar_extruir18_tool1 = extrude(cortar_extruir18_sk1.sketch, amount=-CORTAR_EXTRUIR18_REACH, mode=Mode.PRIVATE) & part.part
    add(cortar_extruir18_tool1.solids().sort_by_distance((-60.398011, 14.672215, 0))[0], mode=Mode.SUBTRACT)


solid = part.part
